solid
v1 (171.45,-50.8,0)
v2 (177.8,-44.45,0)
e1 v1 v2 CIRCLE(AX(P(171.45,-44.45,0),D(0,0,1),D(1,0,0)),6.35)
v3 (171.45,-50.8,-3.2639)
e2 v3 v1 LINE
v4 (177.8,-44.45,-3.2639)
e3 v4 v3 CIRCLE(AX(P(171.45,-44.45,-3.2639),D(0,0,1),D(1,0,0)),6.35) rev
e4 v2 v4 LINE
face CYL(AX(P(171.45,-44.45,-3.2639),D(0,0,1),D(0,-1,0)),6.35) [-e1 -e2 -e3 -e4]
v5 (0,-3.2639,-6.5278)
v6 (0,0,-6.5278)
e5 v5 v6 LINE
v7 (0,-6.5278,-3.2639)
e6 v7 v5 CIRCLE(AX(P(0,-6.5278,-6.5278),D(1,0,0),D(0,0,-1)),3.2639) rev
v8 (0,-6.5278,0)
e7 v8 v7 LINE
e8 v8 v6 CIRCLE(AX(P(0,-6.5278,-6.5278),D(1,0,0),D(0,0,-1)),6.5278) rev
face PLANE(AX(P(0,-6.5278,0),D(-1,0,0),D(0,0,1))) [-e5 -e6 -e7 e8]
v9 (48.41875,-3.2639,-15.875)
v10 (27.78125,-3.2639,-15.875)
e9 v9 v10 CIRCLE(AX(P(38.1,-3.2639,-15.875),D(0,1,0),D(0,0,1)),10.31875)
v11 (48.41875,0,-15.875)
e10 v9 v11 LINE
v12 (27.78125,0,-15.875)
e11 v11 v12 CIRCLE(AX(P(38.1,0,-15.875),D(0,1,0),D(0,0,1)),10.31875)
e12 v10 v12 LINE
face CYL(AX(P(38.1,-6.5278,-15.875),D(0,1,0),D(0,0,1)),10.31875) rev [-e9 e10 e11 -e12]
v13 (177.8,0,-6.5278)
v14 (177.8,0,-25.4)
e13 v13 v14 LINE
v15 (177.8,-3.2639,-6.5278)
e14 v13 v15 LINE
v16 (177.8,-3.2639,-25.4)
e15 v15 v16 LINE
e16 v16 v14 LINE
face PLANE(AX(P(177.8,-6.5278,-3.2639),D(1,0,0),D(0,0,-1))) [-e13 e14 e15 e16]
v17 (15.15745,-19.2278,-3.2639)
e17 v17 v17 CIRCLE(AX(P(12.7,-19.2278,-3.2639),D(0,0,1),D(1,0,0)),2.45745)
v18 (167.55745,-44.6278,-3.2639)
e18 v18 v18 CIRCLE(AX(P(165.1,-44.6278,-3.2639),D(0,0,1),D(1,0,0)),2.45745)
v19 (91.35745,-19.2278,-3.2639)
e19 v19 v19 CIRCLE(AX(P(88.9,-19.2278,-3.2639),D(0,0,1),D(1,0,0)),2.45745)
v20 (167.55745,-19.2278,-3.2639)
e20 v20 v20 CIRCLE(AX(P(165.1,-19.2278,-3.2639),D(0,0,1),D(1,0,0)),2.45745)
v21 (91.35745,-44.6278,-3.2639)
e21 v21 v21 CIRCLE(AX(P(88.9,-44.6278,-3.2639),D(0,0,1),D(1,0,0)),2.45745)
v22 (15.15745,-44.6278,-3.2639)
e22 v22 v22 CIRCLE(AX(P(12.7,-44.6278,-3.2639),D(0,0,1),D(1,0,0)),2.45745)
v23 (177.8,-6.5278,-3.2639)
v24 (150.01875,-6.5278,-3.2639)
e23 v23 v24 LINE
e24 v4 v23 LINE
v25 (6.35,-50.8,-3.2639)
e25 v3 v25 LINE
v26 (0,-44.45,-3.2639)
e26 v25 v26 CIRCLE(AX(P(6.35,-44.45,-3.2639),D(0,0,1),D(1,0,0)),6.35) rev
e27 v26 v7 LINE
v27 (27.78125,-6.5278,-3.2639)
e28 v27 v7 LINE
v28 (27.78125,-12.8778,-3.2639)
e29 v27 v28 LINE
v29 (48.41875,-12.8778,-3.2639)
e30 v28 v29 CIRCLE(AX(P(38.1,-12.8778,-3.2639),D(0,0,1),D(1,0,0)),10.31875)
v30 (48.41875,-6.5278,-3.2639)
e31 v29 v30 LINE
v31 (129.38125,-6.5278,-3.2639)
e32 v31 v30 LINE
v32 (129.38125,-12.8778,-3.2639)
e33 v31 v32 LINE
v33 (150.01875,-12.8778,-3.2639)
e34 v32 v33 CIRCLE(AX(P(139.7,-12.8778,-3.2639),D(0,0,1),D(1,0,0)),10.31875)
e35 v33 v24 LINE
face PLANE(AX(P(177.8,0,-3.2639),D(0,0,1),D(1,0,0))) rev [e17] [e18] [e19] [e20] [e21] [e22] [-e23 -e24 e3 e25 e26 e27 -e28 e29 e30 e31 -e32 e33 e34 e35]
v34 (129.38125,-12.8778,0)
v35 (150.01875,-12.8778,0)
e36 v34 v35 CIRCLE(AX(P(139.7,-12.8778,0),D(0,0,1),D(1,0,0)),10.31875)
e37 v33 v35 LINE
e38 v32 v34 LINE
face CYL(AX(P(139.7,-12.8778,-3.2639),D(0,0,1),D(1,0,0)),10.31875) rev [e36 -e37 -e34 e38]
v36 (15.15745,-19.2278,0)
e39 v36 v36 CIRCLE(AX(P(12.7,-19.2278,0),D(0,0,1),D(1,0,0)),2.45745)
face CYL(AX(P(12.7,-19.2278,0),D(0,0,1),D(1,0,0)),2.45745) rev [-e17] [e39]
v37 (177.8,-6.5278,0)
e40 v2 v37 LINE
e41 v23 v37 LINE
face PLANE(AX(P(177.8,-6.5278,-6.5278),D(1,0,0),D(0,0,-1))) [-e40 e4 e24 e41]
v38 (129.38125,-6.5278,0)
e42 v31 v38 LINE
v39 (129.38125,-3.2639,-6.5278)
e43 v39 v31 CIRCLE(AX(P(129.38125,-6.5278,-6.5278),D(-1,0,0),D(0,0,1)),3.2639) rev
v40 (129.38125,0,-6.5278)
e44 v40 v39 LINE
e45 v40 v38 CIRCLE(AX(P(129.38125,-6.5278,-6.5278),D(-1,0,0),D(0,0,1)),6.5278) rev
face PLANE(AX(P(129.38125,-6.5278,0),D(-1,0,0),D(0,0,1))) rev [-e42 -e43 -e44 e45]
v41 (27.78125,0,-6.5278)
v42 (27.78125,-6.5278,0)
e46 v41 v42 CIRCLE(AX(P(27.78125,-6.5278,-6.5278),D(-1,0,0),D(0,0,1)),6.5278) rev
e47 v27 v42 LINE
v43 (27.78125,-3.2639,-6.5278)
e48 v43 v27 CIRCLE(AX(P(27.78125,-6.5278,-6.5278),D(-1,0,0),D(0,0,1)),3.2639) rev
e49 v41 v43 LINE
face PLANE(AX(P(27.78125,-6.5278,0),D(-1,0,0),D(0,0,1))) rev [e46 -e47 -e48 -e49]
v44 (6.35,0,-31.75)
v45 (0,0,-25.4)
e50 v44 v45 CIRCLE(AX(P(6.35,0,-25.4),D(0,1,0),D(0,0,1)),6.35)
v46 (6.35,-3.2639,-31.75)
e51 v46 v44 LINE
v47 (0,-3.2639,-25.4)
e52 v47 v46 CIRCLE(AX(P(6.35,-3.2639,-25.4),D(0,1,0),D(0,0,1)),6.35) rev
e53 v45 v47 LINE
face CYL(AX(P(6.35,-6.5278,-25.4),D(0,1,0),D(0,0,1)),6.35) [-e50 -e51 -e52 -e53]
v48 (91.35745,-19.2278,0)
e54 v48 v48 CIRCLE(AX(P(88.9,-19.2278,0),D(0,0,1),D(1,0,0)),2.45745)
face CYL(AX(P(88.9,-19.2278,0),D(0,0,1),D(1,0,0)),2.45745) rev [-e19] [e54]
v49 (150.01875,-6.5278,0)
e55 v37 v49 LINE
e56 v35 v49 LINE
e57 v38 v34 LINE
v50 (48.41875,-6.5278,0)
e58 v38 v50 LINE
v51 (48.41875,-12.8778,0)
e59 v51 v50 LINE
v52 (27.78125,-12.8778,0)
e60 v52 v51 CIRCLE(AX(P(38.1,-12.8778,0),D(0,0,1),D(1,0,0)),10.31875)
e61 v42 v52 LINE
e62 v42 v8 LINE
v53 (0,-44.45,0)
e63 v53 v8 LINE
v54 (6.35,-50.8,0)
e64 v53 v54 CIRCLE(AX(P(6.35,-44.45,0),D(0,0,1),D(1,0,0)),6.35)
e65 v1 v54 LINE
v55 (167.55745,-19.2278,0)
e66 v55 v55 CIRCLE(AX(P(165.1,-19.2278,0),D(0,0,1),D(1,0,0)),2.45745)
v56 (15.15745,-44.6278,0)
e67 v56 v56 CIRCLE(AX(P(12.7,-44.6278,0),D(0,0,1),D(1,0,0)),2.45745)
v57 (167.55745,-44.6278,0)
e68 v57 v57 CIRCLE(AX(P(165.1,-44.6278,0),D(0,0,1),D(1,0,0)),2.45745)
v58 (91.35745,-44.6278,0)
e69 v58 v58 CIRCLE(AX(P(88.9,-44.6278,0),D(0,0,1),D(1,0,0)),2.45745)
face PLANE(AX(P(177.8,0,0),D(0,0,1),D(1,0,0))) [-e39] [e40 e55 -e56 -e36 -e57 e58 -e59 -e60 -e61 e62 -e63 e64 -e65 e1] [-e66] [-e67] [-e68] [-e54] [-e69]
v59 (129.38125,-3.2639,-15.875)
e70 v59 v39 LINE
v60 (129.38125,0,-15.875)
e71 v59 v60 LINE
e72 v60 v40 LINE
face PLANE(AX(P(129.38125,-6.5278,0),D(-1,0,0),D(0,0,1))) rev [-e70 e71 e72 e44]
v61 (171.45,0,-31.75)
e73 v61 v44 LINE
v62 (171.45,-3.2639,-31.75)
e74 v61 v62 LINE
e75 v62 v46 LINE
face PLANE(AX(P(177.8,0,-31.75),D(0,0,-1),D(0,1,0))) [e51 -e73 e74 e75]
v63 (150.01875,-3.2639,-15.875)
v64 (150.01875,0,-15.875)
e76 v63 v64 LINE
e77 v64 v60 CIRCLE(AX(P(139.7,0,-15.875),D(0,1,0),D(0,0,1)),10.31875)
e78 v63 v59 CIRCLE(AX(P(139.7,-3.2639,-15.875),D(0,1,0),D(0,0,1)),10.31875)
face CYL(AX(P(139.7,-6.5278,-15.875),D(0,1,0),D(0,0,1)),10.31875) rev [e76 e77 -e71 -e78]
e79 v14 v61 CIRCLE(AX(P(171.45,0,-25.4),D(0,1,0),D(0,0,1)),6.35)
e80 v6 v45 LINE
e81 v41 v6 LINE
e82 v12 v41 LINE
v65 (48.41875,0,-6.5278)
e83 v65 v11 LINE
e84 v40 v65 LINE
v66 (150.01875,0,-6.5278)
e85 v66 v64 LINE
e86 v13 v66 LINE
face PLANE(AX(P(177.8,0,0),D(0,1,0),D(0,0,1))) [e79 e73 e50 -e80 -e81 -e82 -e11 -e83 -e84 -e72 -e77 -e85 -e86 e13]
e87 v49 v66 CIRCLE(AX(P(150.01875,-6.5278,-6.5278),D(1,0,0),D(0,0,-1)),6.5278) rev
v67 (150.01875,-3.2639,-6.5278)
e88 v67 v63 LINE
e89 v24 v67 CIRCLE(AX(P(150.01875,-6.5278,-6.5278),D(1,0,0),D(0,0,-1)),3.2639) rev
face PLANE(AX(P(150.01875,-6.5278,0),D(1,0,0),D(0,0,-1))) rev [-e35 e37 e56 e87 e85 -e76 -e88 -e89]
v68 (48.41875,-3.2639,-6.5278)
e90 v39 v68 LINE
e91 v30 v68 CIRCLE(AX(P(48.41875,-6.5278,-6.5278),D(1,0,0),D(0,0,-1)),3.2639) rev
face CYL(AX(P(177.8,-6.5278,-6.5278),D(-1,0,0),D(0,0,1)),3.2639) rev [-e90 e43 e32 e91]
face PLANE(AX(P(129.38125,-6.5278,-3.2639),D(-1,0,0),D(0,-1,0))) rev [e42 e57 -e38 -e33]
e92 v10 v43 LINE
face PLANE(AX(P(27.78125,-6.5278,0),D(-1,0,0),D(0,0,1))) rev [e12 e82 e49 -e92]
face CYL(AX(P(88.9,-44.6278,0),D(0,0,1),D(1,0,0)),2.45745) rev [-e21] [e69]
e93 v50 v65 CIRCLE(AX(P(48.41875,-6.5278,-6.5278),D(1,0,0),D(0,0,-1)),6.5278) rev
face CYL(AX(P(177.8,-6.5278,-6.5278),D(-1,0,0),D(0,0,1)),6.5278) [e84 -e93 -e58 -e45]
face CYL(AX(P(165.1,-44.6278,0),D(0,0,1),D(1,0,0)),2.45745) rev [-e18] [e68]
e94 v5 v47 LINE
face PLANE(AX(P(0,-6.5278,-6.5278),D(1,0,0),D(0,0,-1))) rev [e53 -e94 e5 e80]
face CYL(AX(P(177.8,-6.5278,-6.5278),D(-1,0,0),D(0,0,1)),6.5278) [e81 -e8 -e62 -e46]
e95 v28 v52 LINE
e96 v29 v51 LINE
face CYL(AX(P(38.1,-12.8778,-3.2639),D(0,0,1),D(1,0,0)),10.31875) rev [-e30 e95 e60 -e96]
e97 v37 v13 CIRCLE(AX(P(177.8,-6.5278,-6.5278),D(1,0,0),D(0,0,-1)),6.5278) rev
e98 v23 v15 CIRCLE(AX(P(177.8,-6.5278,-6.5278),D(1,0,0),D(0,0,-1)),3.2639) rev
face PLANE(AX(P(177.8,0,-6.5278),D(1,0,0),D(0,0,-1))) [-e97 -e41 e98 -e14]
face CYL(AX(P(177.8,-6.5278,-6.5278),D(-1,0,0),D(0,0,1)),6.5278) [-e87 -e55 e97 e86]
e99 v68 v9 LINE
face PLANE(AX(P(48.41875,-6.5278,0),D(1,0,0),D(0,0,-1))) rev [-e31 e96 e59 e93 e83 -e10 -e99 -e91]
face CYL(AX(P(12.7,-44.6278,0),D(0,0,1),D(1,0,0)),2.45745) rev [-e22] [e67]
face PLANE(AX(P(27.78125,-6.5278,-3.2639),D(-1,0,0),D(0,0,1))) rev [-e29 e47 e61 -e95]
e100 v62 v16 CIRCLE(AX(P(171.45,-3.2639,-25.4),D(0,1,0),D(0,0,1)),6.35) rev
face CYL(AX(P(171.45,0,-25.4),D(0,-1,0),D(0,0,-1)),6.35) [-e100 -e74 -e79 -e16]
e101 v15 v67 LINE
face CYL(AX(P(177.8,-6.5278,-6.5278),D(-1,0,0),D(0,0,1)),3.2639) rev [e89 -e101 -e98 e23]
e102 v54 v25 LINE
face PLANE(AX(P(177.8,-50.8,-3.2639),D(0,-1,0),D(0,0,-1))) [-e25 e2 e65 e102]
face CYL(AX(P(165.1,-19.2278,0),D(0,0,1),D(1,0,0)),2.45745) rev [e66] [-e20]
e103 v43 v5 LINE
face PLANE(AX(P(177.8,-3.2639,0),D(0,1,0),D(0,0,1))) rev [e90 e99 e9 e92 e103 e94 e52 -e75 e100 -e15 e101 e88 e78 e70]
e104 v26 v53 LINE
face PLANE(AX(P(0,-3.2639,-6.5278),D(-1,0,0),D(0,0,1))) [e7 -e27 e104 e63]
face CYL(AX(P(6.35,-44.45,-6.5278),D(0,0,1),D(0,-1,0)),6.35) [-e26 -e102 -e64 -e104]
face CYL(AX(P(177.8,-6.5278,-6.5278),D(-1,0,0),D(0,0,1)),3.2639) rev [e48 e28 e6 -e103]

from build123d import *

# Parameters (mm, degrees)
BASE_FLANGE1_DEPTH           = 177.8
CUT_EXTRUDE1_DEPTH           = 6.5278
F_10_0_1935_DIAMETER_HOLE1_D = 4.9149
FILLET1_R                    = 6.35
CUT_EXTRUDE2_DEPTH           = 3.2639


# Sheet-metal steps are written as plain solids
with BuildPart() as part:
    # Sketch1 → Base-Flange1 (new body)
    with BuildSketch(Plane(origin=(0, 0, 0), x_dir=(0, 0, -1), z_dir=(1, 0, 0))):
        with BuildLine():
            Line((31.75, 0), (6.5278, 0))
            ThreePointArc((6.5278, 0), (1.911948354, -1.911948354), (0, -6.5278))
            Line((0, -6.5278), (0, -50.8))
            Line((0, -50.8), (3.2639, -50.8))
            Line((3.2639, -50.8), (3.2639, -6.5278))
            ThreePointArc((3.2639, -6.5278), (4.219874177, -4.219874177), (6.5278, -3.2639))
            Line((6.5278, -3.2639), (31.75, -3.2639))
            Line((31.75, -3.2639), (31.75, 0))
        make_face()
    extrude(amount=BASE_FLANGE1_DEPTH)

    # Sketch6 → Cut-Extrude1 (cut)
    with BuildSketch(Plane(origin=(0, 0, 0), x_dir=(1, 0, 0), z_dir=(0, 1, 0))):
        with BuildLine():
            Line((27.78125, 0), (27.78125, 15.875))
            ThreePointArc((27.78125, 15.875), (38.1, 26.19375), (48.41875, 15.875))
            Line((48.41875, 15.875), (48.41875, 0))
            ThreePointArc((48.41875, 0), (38.1, -10.31875), (27.78125, 0))
        make_face()
        with BuildLine():
            Line((129.38125, 0), (129.38125, 15.875))
            ThreePointArc((129.38125, 15.875), (139.7, 26.19375), (150.01875, 15.875))
            Line((150.01875, 15.875), (150.01875, 0))
            ThreePointArc((150.01875, 0), (139.7, -10.31875), (129.38125, 0))
        make_face()
    extrude(amount=-CUT_EXTRUDE1_DEPTH, mode=Mode.SUBTRACT)

    # #10 (0.1935) Diameter Hole1 (through all)
    with Locations(Plane.XY):
        with Locations((12.7, -19.2278), (88.9, -19.2278), (165.1, -19.2278), (88.9, -44.6278), (165.1, -44.6278), (12.7, -44.6278)):
            Hole(F_10_0_1935_DIAMETER_HOLE1_D / 2)

    # Fillet1
    fillet1_edges = [part.edges().sort_by_distance(p)[0] for p in [
        (177.8, -50.8, -1.63195),
        (0, -50.8, -1.63195),
        (177.8, -1.63195, -31.75),
        (0, -1.63195, -31.75),
    ]]
    fillet(fillet1_edges, radius=FILLET1_R)

    # Sketch9 → Cut-Extrude2 (cut)
    with BuildSketch(Plane.XY):
        with BuildLine():
            Line((48.41875, -6.5278), (48.41875, -12.8778))
            ThreePointArc((48.41875, -12.8778), (38.1, -23.19655), (27.78125, -12.8778))
            Line((27.78125, -12.8778), (27.78125, -6.5278))
            ThreePointArc((27.78125, -6.5278), (38.1, 3.79095), (48.41875, -6.5278))
        make_face()
        with BuildLine():
            Line((150.01875, -6.5278), (150.01875, -12.8778))
            ThreePointArc((150.01875, -12.8778), (139.7, -23.19655), (129.38125, -12.8778))
            Line((129.38125, -12.8778), (129.38125, -6.5278))
            ThreePointArc((129.38125, -6.5278), (139.7, 3.79095), (150.01875, -6.5278))
        make_face()
    extrude(amount=-CUT_EXTRUDE2_DEPTH, mode=Mode.SUBTRACT)


solid = part.part
